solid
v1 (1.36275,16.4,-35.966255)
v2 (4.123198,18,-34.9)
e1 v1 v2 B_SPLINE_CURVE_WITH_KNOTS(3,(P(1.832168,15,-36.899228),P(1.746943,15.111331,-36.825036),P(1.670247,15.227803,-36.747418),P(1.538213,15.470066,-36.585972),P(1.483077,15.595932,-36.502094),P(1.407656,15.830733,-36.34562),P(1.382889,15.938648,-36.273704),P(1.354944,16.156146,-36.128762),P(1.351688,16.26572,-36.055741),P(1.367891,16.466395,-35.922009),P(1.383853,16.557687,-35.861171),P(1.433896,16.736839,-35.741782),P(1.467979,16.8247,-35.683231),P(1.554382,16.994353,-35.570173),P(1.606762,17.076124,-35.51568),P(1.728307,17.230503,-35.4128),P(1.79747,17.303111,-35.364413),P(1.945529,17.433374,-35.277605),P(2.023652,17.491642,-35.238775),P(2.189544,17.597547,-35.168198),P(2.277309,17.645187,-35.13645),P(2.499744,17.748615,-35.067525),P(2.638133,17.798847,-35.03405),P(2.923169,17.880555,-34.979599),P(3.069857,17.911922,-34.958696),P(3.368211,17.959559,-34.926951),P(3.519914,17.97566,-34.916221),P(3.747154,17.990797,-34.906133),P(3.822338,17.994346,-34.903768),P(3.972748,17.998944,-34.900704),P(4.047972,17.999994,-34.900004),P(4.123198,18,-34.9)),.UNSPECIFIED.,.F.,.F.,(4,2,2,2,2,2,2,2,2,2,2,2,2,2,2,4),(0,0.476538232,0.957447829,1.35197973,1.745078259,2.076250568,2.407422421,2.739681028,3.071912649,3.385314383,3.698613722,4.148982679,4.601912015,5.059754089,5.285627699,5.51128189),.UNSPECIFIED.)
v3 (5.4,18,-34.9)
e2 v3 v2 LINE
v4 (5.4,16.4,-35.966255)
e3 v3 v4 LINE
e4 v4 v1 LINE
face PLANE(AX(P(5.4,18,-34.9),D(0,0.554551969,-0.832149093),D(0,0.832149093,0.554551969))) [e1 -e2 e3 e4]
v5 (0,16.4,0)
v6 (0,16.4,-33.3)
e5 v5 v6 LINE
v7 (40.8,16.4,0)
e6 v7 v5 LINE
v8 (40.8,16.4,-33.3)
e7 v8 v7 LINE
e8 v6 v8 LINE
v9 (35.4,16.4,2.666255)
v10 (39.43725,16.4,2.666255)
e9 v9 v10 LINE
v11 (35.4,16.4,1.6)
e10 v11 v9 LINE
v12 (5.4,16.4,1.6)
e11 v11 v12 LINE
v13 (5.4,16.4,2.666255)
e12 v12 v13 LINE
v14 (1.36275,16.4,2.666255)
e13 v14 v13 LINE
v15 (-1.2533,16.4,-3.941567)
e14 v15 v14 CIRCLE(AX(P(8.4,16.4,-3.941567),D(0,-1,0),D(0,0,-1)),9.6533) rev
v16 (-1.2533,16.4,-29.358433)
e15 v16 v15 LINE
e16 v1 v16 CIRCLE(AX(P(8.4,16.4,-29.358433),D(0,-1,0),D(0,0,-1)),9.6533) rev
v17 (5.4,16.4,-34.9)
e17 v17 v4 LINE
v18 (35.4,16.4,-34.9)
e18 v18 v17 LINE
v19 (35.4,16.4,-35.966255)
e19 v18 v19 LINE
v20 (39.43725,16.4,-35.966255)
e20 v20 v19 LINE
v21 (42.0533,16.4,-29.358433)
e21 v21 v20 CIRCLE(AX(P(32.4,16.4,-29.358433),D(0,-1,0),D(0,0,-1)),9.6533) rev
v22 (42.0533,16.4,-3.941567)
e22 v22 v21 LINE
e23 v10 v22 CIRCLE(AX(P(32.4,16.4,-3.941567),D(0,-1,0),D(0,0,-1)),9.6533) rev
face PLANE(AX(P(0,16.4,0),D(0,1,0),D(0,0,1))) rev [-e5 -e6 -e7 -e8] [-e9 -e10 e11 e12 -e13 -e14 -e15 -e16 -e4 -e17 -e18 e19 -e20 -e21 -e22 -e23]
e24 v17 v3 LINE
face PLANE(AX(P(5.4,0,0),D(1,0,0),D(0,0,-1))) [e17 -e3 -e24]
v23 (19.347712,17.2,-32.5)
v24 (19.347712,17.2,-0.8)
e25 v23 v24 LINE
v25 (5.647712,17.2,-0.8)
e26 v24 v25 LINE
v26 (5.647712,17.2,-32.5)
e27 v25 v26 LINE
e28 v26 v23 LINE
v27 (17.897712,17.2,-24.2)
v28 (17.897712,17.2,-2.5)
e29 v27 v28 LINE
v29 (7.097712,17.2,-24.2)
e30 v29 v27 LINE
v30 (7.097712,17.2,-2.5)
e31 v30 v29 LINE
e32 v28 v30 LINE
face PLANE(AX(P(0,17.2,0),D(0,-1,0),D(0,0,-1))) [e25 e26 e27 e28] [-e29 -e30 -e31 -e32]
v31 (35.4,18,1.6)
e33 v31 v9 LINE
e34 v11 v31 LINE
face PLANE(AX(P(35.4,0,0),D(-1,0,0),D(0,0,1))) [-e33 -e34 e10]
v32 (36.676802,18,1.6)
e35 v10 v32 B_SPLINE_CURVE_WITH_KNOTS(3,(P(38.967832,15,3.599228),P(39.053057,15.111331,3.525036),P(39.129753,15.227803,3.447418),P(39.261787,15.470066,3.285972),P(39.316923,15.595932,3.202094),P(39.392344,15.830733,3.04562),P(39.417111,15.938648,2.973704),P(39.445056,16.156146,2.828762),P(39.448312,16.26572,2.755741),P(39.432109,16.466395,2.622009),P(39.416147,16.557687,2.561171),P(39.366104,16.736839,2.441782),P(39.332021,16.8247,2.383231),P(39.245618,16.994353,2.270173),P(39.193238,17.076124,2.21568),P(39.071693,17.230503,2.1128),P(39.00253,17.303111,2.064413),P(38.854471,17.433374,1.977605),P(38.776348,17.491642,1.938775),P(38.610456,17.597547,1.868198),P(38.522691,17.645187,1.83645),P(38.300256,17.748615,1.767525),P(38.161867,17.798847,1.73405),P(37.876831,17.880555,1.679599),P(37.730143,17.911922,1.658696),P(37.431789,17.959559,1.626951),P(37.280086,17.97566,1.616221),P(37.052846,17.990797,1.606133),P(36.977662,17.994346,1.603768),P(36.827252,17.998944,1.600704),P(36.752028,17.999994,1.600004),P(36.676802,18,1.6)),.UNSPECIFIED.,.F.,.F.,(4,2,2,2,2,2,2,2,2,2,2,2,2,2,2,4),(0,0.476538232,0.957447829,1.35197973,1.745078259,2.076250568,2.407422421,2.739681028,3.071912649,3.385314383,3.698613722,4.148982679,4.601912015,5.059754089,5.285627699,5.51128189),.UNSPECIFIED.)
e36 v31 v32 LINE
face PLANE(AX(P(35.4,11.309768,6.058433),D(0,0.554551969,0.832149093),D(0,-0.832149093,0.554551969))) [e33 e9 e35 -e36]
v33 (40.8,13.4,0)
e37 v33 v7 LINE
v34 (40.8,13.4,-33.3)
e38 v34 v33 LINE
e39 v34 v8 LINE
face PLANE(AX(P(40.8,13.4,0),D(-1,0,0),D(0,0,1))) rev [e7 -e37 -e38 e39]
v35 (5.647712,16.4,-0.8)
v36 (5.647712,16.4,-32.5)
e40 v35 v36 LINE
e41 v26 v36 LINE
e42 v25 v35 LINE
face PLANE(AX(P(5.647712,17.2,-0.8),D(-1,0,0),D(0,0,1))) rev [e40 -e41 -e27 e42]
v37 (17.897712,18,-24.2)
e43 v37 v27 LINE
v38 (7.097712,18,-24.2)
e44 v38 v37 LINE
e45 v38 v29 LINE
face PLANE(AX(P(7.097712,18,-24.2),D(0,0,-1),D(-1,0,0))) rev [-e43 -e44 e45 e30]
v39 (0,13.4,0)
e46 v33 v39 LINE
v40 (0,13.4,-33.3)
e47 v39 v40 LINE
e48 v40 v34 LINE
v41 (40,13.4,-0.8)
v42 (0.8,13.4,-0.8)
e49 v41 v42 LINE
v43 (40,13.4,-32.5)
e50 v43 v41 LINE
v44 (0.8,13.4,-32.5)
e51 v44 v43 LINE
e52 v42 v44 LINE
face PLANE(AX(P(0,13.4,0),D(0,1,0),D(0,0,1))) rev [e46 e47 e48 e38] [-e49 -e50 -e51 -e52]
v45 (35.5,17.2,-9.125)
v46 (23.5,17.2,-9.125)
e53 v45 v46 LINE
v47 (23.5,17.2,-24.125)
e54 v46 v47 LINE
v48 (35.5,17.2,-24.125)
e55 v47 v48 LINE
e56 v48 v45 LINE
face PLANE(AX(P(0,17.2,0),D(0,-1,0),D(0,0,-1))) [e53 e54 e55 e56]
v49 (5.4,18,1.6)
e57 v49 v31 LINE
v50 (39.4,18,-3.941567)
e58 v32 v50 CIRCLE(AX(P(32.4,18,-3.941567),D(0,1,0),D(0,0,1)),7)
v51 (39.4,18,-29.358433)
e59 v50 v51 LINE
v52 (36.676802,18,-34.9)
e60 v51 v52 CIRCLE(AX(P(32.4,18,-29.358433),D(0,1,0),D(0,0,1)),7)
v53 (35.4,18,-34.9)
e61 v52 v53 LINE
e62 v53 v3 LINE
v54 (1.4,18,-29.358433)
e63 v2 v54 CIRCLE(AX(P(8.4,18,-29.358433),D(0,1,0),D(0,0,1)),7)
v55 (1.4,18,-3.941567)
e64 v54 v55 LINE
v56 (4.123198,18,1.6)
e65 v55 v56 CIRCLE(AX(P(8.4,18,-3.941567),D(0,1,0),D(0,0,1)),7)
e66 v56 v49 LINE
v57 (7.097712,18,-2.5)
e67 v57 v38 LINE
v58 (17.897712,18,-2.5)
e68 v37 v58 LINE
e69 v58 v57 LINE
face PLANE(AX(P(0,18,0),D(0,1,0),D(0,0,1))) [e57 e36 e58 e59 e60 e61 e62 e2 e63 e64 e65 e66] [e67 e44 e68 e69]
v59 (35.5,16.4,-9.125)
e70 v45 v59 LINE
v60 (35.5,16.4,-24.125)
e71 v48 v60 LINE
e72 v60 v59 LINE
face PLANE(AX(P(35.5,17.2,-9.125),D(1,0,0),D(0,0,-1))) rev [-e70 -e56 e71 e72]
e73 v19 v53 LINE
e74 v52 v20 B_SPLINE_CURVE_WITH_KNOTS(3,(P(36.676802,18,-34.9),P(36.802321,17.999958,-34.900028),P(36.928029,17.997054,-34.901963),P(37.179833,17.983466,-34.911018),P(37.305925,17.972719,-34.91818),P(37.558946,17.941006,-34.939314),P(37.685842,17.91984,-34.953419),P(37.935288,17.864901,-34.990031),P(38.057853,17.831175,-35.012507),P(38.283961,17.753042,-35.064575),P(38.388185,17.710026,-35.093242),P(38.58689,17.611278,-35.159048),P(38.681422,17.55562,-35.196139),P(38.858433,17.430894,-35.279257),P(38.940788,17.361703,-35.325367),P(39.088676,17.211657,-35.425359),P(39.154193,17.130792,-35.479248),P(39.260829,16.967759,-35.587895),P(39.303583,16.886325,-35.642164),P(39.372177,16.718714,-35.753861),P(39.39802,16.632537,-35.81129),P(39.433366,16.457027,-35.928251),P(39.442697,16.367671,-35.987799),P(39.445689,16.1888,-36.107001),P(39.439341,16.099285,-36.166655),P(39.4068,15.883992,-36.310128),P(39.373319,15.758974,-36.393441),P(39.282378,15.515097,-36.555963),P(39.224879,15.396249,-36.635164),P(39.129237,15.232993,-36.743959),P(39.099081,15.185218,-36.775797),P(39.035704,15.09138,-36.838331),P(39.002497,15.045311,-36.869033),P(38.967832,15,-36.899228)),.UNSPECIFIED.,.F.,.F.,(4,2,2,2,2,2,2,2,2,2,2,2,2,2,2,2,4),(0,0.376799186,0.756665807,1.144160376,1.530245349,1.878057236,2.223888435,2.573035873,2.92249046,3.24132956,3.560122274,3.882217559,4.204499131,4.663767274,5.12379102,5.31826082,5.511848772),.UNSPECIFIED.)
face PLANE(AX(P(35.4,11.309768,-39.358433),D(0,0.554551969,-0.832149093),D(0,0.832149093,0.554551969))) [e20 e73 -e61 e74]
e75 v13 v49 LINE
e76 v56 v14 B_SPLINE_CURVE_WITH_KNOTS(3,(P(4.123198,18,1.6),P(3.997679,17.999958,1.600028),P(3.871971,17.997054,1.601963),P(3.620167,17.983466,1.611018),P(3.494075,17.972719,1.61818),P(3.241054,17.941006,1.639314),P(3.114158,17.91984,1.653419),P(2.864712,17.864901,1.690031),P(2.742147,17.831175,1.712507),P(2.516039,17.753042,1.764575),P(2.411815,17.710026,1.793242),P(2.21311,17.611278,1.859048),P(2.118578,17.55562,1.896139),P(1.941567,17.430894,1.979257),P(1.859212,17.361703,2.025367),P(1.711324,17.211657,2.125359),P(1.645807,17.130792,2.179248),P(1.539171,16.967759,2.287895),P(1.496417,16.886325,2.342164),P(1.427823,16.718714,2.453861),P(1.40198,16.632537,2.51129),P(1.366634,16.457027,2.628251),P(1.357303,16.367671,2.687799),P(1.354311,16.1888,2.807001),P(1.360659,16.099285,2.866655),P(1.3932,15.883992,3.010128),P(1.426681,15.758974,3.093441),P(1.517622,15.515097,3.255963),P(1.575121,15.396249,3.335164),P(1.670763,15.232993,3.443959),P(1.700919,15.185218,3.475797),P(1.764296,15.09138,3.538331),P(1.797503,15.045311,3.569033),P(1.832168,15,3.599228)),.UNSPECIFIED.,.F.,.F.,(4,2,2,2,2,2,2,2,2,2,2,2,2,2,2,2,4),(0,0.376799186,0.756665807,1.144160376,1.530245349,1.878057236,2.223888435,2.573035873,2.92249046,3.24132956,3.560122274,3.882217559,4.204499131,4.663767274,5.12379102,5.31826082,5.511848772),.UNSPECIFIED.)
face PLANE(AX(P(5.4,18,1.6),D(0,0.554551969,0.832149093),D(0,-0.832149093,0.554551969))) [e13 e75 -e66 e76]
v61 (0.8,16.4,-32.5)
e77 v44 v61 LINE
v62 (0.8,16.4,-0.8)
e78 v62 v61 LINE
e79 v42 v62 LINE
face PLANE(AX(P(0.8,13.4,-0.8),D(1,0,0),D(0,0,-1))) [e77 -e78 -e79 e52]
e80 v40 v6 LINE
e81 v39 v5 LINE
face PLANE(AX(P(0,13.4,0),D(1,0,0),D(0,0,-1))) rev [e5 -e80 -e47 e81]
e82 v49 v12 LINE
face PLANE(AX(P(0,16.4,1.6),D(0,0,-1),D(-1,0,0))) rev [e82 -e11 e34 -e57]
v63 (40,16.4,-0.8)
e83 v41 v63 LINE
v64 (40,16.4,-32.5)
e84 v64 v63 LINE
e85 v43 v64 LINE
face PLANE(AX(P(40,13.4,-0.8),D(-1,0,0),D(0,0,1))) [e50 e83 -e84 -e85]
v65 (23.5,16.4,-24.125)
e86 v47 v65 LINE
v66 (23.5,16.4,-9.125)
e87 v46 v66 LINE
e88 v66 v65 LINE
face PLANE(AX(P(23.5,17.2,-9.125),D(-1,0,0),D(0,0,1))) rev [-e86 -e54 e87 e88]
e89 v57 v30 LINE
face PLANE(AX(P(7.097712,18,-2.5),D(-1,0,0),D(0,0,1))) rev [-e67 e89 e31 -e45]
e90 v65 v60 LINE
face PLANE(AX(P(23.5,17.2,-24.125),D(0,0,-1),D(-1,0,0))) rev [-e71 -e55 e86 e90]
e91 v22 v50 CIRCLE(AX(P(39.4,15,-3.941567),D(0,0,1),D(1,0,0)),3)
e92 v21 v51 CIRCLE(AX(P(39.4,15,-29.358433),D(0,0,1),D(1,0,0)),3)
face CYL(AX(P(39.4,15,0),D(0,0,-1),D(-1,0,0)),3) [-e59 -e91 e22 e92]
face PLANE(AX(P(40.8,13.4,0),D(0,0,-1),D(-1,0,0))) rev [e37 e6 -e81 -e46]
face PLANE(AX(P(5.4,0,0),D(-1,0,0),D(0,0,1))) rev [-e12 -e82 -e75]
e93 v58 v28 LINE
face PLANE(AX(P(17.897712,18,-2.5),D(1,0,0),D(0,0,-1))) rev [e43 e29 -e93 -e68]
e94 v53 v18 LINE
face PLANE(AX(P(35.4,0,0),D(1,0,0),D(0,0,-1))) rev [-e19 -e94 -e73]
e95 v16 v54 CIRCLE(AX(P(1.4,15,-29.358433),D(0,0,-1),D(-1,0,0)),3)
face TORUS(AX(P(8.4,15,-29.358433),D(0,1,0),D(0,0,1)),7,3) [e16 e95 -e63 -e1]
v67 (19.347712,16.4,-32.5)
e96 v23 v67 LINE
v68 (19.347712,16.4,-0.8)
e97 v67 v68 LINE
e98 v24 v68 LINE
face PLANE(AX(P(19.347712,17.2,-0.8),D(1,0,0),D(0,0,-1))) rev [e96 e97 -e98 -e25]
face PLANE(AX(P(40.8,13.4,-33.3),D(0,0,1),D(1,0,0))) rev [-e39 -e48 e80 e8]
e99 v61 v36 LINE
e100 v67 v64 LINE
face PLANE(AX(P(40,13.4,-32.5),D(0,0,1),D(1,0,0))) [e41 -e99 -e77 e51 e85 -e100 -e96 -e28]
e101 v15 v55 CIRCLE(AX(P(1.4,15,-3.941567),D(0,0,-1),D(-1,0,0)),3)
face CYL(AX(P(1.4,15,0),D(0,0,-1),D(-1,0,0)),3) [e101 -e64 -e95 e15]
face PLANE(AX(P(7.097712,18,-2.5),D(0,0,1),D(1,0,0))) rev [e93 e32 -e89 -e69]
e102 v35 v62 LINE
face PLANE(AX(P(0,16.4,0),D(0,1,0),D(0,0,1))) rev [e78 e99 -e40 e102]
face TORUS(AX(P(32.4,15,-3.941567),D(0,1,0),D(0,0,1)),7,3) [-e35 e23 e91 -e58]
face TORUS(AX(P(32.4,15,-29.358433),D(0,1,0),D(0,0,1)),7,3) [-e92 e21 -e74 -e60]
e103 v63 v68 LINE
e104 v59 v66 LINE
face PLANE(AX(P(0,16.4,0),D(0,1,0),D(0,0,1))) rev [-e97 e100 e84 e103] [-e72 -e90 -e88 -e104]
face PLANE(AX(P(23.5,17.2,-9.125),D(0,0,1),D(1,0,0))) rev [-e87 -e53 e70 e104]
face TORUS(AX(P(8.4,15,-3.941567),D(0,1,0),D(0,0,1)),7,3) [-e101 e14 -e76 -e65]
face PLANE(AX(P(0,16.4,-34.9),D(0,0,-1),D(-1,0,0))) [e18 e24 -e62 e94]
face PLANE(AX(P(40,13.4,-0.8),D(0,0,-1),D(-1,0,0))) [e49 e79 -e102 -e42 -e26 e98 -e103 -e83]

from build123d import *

# Parameters (mm, degrees)
SKETCH_1_W          = 40.8
SKETCH_1_H          = 33.3
EXTRUDE_3_DEPTH     = 16.4
SKETCH_2_W          = 40.8
SKETCH_2_H          = 33.3
EXTRUDE_4_DEPTH     = 1.6
SKETCH_4_W          = 17.099999999999994
SKETCH_4_H          = 13.8
CUT_EXTRUDE_1_DEPTH = 0.8
SKETCH_5_W          = 4.100000000000001
SKETCH_5_H          = 6.399999999999999
CUT_EXTRUDE_2_DEPTH = 0.8
EXTRUDE_5_DEPTH     = 3.5
EXTRUDE_5_2_DEPTH   = 3.5
EXTRUDE_5_3_DEPTH   = 3.5
SKETCH_6_W          = 3.000000000000007
SKETCH_6_H          = 3.0000000000000036
EXTRUDE_5_4_DEPTH   = 3.5
SKETCH_7_W          = 3.000000000000007
SKETCH_7_H          = 33.3
EXTRUDE_7_DEPTH     = 1.6
SKETCH_8_R          = 2.4500000000000015
SKETCH_8_W          = 10.999999999999998
SKETCH_8_H          = 4.8999999999999995
CUT_EXTRUDE_3_DEPTH = 1.6
SKETCH_10_W         = 44
SKETCH_10_H         = 36.49999999999999
EXTRUDE_8_DEPTH     = 1.6
SKETCH_11_W         = 2.0999999999999996
SKETCH_11_H         = 6.020000000000001
EXTRUDE_9_DEPTH     = 44
EXTRUDE_12_DEPTH    = 7
SKETCH_15_W         = 2.1000000000000085
SKETCH_15_H         = 6.019999999999997
EXTRUDE_13_DEPTH    = 37
EXTRUDE_14_DEPTH    = 7
EXTRUDE_15_DEPTH    = 7
FILLET_1_R          = 10
FILLET_2_R          = 3.2
FILLET_3_R          = 3
SKETCH_17_W         = 56.29646115275759
SKETCH_17_H         = 50.293284015615065
CUT_EXTRUDE_4_DEPTH = 16.4
EXTRUDE_16_DEPTH    = 3
CUT_EXTRUDE_6_DEPTH = 0.8
CUT_EXTRUDE_7_DEPTH = 0.8
CUT_EXTRUDE_8_DEPTH = 0.8


with BuildPart() as part:
    # Эскиз1 → Бобышка-Вытянуть3 (new body)
    with BuildSketch(Plane(origin=(0, 0, 0), x_dir=(1, 0, 0), z_dir=(0, 1, 0))):
        Polygon((42.399999999999984, 34.89999999999999), (42.39999999999999, -1.600000000000004), (-1.6000000000000032, -1.600000000000004), (-1.6000000000000076, 34.89999999999999), align=None)
        with Locations((20.4, 16.65)):
            Rectangle(SKETCH_1_W, SKETCH_1_H, mode=Mode.SUBTRACT)
    extrude(amount=EXTRUDE_3_DEPTH)

    # Эскиз2 → Бобышка-Вытянуть4 (add)
    with BuildSketch(Plane(origin=(0, 0, 0), x_dir=(-1, 0, 0), z_dir=(0, -1, 0))):
        with Locations((-20.4, 16.65)):
            Rectangle(SKETCH_2_W, SKETCH_2_H)
    extrude(amount=-EXTRUDE_4_DEPTH)

    # Эскиз4 → Вырез-Вытянуть1 (cut)
    with BuildSketch(Plane(origin=(0, 1.6, 0), x_dir=(1, 0, 0), z_dir=(0, 1, 0))):
        with Locations((20.4, 16.65)):
            Rectangle(SKETCH_4_W, SKETCH_4_H)
    extrude(amount=-CUT_EXTRUDE_1_DEPTH, mode=Mode.SUBTRACT)

    # Эскиз5 → Вырез-Вытянуть2 (cut)
    with BuildSketch(Plane(origin=(0, 0.8, 0), x_dir=(1, 0, 0), z_dir=(0, 1, 0))):
        with Locations((20.4, 16.65)):
            Rectangle(SKETCH_5_W, SKETCH_5_H)
    extrude(amount=-CUT_EXTRUDE_2_DEPTH, mode=Mode.SUBTRACT)

    # Эскиз8 → Вырез-Вытянуть3 (cut)
    with BuildSketch(Plane.ZY.offset(1.6000000000000034)):
        with Locations((-22.149999999999995, 8.95)):
            Circle(SKETCH_8_R)
        with Locations((-11.149999999999993, 8.95)):
            Circle(SKETCH_8_R)
        with Locations((-16.64999999999999, 8.950000000000001)):
            Rectangle(SKETCH_8_W, SKETCH_8_H)
    extrude(amount=-CUT_EXTRUDE_3_DEPTH, mode=Mode.SUBTRACT)

    # Эскиз10 → Бобышка-Вытянуть8 (add)
    with BuildSketch(Plane(origin=(0, 16.4, 0), x_dir=(1, 0, 0), z_dir=(0, 1, 0))):
        with Locations((20.39999999999999, 16.649999999999995)):
            Rectangle(SKETCH_10_W, SKETCH_10_H)
    extrude(amount=EXTRUDE_8_DEPTH)



with BuildPart() as body_2:
    # Эскиз6 → Бобышка-Вытянуть5 (new body)
    with BuildSketch(Plane(origin=(0, 1.6, 0), x_dir=(1, 0, 0), z_dir=(0, 1, 0))):
        Polygon((0, 33.3), (3, 33.3), (3.0000000000000004, 30.299999999999997), (3.7e-16, 30.299999999999997), align=None)
    extrude(amount=EXTRUDE_5_DEPTH)


with BuildPart() as body_3:
    # Эскиз6 → Extrude 5 2 (new body)
    with BuildSketch(Plane(origin=(0, 1.6, 0), x_dir=(1, 0, 0), z_dir=(0, 1, 0))):
        Polygon((0, 0), (3, 0), (2.9999999999999996, 3), (-8.7e-16, 3), align=None)
    extrude(amount=EXTRUDE_5_2_DEPTH)


with BuildPart() as body_4:
    # Эскиз6 → Extrude 5 3 (new body)
    with BuildSketch(Plane(origin=(0, 1.6, 0), x_dir=(1, 0, 0), z_dir=(0, 1, 0))):
        Polygon((40.8, 0), (37.79999999999999, -3.7e-16), (37.79999999999999, 2.9999999999999996), (40.8, 3), align=None)
    extrude(amount=EXTRUDE_5_3_DEPTH)


with BuildPart() as body_5:
    # Эскиз6 → Extrude 5 4 (new body)
    with BuildSketch(Plane(origin=(0, 1.6, 0), x_dir=(1, 0, 0), z_dir=(0, 1, 0))):
        with Locations((39.3, 31.799999999999997)):
            Rectangle(SKETCH_6_W, SKETCH_6_H)
    extrude(amount=EXTRUDE_5_4_DEPTH)


with BuildPart() as body_6:
    # Эскиз7 → Бобышка-Вытянуть7 (new body)
    with BuildSketch(Plane(origin=(0, 5.1000000000000005, 0), x_dir=(1, 0, 0), z_dir=(0, 1, 0))):
        with Locations((39.3, 16.65)):
            Rectangle(SKETCH_7_W, SKETCH_7_H)
    extrude(amount=EXTRUDE_7_DEPTH)


with BuildPart() as body_6_1:
    # Move Body 1: read off the stored shape, not the designer's step
    # Move Body 1: moved
    add(body_6.part.moved(Location((0, 5.27, 0))))


with BuildPart() as body_7:
    # Эскиз11 → Бобышка-Вытянуть9 (new body)
    with BuildSketch(Plane(origin=(42.39999999999999, 0, -8.06e-15), x_dir=(-1.9e-16, 0, -1), z_dir=(1, 0, -1.9e-16))):
        with Locations((-5.008433364905541, 9)):
            Rectangle(SKETCH_11_W, SKETCH_11_H)
    extrude(amount=-EXTRUDE_9_DEPTH)


with BuildPart() as part_1:
    add(part.part)

    add(body_7.part)  # Бобышка-Вытянуть12 merges body 7
    # Эскиз12 → Бобышка-Вытянуть12 (add)
    with BuildSketch(Plane(origin=(42.39999999999999, 0, -8.06e-15), x_dir=(-1.9e-16, 0, -1), z_dir=(1, 0, -1.9e-16))):
        Polygon((-1.6000000000000123, 0), (-6.0584333649055395, 6.675491735766058), (-6.05843336490554, 11.309768082903124), (-1.6000000000000123, 18), align=None)
        Polygon((34.899999999999984, 18.00000000000004), (34.899999999999984, 3.25e-15), (39.35843336490551, 6.675491735766043), (39.35843336490551, 11.309768082903172), align=None)
    extrude(amount=-EXTRUDE_12_DEPTH)

    # Эскиз15 → Бобышка-Вытянуть13 (add)
    with BuildSketch(Plane.ZY.offset(-35.39999999999997)):
        with Locations((-38.30843336490551, 8.994768082903173)):
            Rectangle(SKETCH_15_W, SKETCH_15_H)
    extrude(amount=EXTRUDE_13_DEPTH)

    # Эскиз16 → Бобышка-Вытянуть14 (add)
    with BuildSketch(Plane.ZY.offset(1.6000000000000034)):
        Polygon((-34.89999999999999, 18), (-39.358433364905515, 11.309768082903172), (-39.358433364905515, 6.6797680829031725), (-34.89999999999999, 0), align=None)
    extrude(amount=-EXTRUDE_14_DEPTH)

    # Эскиз14 → Бобышка-Вытянуть15 (add)
    with BuildSketch(Plane.ZY.offset(1.6000000000000034)):
        Polygon((1.600000000000004, 18), (6.058433364905541, 11.309768082903124), (6.05843336490554, 6.675491735766058), (1.600000000000004, 0), align=None)
    extrude(amount=-EXTRUDE_15_DEPTH)

    # Скругление1
    # the kernel refuses this fillet: 10 mm, written as the material it takes off along each edge
    with BuildSketch(Plane(origin=(-1.6000000000000074, 37.010000000000005, 6.05843336490554), x_dir=(4.2e-16, 0, -1), z_dir=(0, -1, 0))) as fillet_1_piece_1:
        with BuildLine():
            CenterArc((FILLET_1_R, FILLET_1_R), FILLET_1_R, 180, 89.99999999999994)
            Line((6.88e-15, FILLET_1_R), (0, 0))
            Line((0, 0), (FILLET_1_R, 0))
        make_face()
    extrude(amount=56.02000000000001, mode=Mode.SUBTRACT)
    with BuildSketch(Plane(origin=(42.39999999999999, 37.01, 6.058433364905532), x_dir=(0, 0, -1), z_dir=(0, -1, 0))) as fillet_1_piece_2:
        with BuildLine():
            CenterArc((FILLET_1_R, -FILLET_1_R), FILLET_1_R, 89.99999999999999, 90.00000000000001)
            Line((-5.33e-15, -FILLET_1_R), (0, 0))
            Line((0, 0), (FILLET_1_R, 0))
        make_face()
    extrude(amount=56.019999999999996, mode=Mode.SUBTRACT)
    with BuildSketch(Plane(origin=(42.399999999999984, -18.324508264233955, -39.358433364905515), x_dir=(0, 0, 1), z_dir=(0, 1, 0))) as fillet_1_piece_3:
        with BuildLine():
            CenterArc((FILLET_1_R, -FILLET_1_R), FILLET_1_R, 90.00000000000003, 89.99999999999997)
            Line((7.11e-15, -FILLET_1_R), (0, 0))
            Line((0, 0), (FILLET_1_R, 0))
        make_face()
    extrude(amount=54.634276347137124, mode=Mode.SUBTRACT)
    with BuildSketch(Plane(origin=(-1.6000000000000298, -19.015231917096827, -39.358433364905515), x_dir=(1, 0, 7.1e-16), z_dir=(0, 1, 0))) as fillet_1_piece_4:
        with BuildLine():
            CenterArc((FILLET_1_R, -FILLET_1_R), FILLET_1_R, 90.00000000000006, 89.99999999999994)
            Line((8.88e-15, -FILLET_1_R), (0, 0))
            Line((0, 0), (FILLET_1_R, 0))
        make_face()
    extrude(amount=56.02, mode=Mode.SUBTRACT)

    # Скругление2
    # the kernel refuses this fillet: 3.2 mm, written as the material it takes off along each edge
    with BuildSketch(Plane(origin=(35.39999999999997, 5.984768082903174, -37.25843336490551), x_dir=(0, 4.2e-16, -1), z_dir=(-1, 0, 0))) as fillet_2_piece_1:
        with BuildLine():
            CenterArc((3.200000000000004, -3.0049958402633457), FILLET_2_R, 110.10550978791592, 69.89449021208412)
            Line((1.27e-15, -3.004995840263347), (0, 0))
            Line((0, 0), (2.1000000000000085, 0))
        make_face()
    extrude(amount=29.99999999999998, mode=Mode.SUBTRACT)
    with BuildSketch(Plane(origin=(35.39999999999997, 5.984768082903174, -37.25843336490551), x_dir=(0, 4.2e-16, -1), z_dir=(-1, 0, 0))) as fillet_2_piece_2_section:
        with BuildLine():
            CenterArc((3.200000000000004, -3.0049958402633457), FILLET_2_R, 110.10550978791592, 69.89449021208412)
            Line((1.27e-15, -3.004995840263347), (0, 0))
            Line((0, 0), (2.1000000000000085, 0))
        make_face()
    fillet_2_piece_2 = extrude(amount=37.51248960065835, mode=Mode.PRIVATE)
    fillet_2_piece_2 = split(fillet_2_piece_2, bisect_by=Plane(origin=(35.39999999999997, 5.229293666046891, -38.39030940389469), z_dir=(0, -0.5551530875809806, -0.8317481886660796)), keep=Keep.TOP, mode=Mode.PRIVATE)
    add(fillet_2_piece_2, mode=Mode.SUBTRACT)
    with BuildSketch(Plane(origin=(35.39999999999997, 12.004768082903173, -37.25843336490551), x_dir=(0, -8.5e-16, -1), z_dir=(-1, 0, 0))) as fillet_2_piece_3:
        with BuildLine():
            CenterArc((3.2000000000000055, 3.004995840263345), FILLET_2_R, 179.99999999999994, 69.89449021208412)
            Line((2.54e-15, 3.004995840263348), (0, 0))
            Line((0, 0), (2.1000000000000085, 0))
        make_face()
    extrude(amount=29.99999999999998, mode=Mode.SUBTRACT)
    with BuildSketch(Plane(origin=(42.91248960065834, 12.004768082903173, -37.25843336490551), x_dir=(0, -8.5e-16, -1), z_dir=(-1, 0, 0))) as fillet_2_piece_4_section:
        with BuildLine():
            CenterArc((3.2000000000000055, 3.004995840263345), FILLET_2_R, 179.99999999999994, 69.89449021208412)
            Line((2.54e-15, 3.004995840263348), (0, 0))
            Line((0, 0), (2.1000000000000085, 0))
        make_face()
    fillet_2_piece_4 = extrude(amount=45.02497920131672, mode=Mode.PRIVATE)
    fillet_2_piece_4 = split(fillet_2_piece_4, bisect_by=Plane(origin=(42.91248960065834, 12.760123030249147, -38.39190321044578), z_dir=(0, 0.5545519689982268, -0.8321490934202775)), keep=Keep.TOP, mode=Mode.PRIVATE)
    add(fillet_2_piece_4, mode=Mode.SUBTRACT)
    with BuildSketch(Plane(origin=(35.39999999999999, 5.99, 3.958433364905534), x_dir=(1.9e-16, 0, 1), z_dir=(-1, 0, 1.9e-16))) as fillet_2_piece_5:
        with BuildLine():
            CenterArc((3.2000000000000006, 3.0049958402633443), FILLET_2_R, 180, 69.89449021208401)
            Line((4.4e-16, 3.0049958402633443), (0, 0))
            Line((0, 0), (2.1, 0))
        make_face()
    extrude(amount=29.999999999999993, mode=Mode.SUBTRACT)
    with BuildSketch(Plane(origin=(42.91248960065835, 12.01, 3.9584333649055328), x_dir=(1.9e-16, 8.5e-16, 1), z_dir=(-1, 0, 1.9e-16))) as fillet_2_piece_6_section:
        with BuildLine():
            CenterArc((3.1999999999999984, -3.004995840263345), FILLET_2_R, 110.10550978791599, 69.89449021208395)
            Line((-2.1e-15, -3.0049958402633425), (0, 0))
            Line((0, 0), (2.0999999999999996, 0))
        make_face()
    fillet_2_piece_6 = extrude(amount=45.024979201316704, mode=Mode.PRIVATE)
    fillet_2_piece_6 = split(fillet_2_piece_6, bisect_by=Plane(origin=(42.91248960065835, 12.763745986939767, 5.089488838090781), z_dir=(0, 0.5545519689982267, 0.8321490934202775)), keep=Keep.TOP, mode=Mode.PRIVATE)
    add(fillet_2_piece_6, mode=Mode.SUBTRACT)
    with BuildSketch(Plane(origin=(35.39999999999999, 12.01, 3.958433364905534), x_dir=(1.9e-16, 8.5e-16, 1), z_dir=(-1, 0, 1.9e-16))) as fillet_2_piece_7:
        with BuildLine():
            CenterArc((3.199999999999998, -3.004995840263345), FILLET_2_R, 110.10550978791599, 69.89449021208395)
            Line((-2.1e-15, -3.0049958402633425), (0, 0))
            Line((0, 0), (2.099999999999999, 0))
        make_face()
    extrude(amount=29.999999999999993, mode=Mode.SUBTRACT)

    # Скругление3
    fillet_3_edges = [part_1.edges().sort_by_distance(p)[0] for p in [
        (41.97186604889837, 17.999999999999996, -32.25314929949211),
        (41.97186604889837, 0, -32.25314929949211),
        (41.97186604889836, 0, -1.0468507005078767),
        (41.97186604889836, 18, -1.0468507005078767),
        (42.39999999999999, 18, -16.65),
        (42.399999999999984, 0, -16.65),
        (-1.6000000000000076, 18, -16.65),
        (-1.6000000000000054, 0, -16.65),
        (-1.1718660488983677, 0, -32.25314929949211),
        (-1.1718660488983677, 17.999999999999996, -32.25314929949211),
        (-1.171866048898364, 0, -1.0468507005078784),
        (-1.171866048898364, 18, -1.0468507005078784),
    ]]
    fillet(fillet_3_edges, radius=FILLET_3_R)


with BuildPart() as cut_extrude_4_tool:
    # Эскиз17 → Вырез-Вытянуть4 (new body)
    with BuildSketch(Plane.XZ):
        with Locations((20.4, -16.650000000000002)):
            Rectangle(SKETCH_17_W, SKETCH_17_H)
    extrude(amount=-CUT_EXTRUDE_4_DEPTH)


with BuildPart() as part_2:
    add(part_1.part)

    # Вырез-Вытянуть4: cut by cut_extrude_4_tool
    add(cut_extrude_4_tool.part, mode=Mode.SUBTRACT)

    # Эскиз18 → Бобышка-Вытянуть16 (add)
    with BuildSketch(Plane(origin=(0, 16.4, 0), x_dir=(-1, 0, 0), z_dir=(0, -1, 0))):
        Polygon((-40.79999999999996, 9.16e-15), (3.296e-14, 1.166e-14), (3.123e-14, 33.30000000000001), (-40.79999999999996, 33.30000000000001), align=None)
        Polygon((-39.999999999999964, 0.8000000000000085), (-0.7999999999999708, 0.8000000000000107), (-0.7999999999999735, 32.500000000000014), (-39.999999999999964, 32.500000000000014), align=None, mode=Mode.SUBTRACT)
    extrude(amount=EXTRUDE_16_DEPTH)

    # Эскиз21 → Вырез-Вытянуть6 (cut)
    with BuildSketch(Plane.XZ.offset(-16.4)):
        Polygon((5.64771181596363, -0.8000000000000085), (19.34771181596362, -0.800000000000006), (19.34771181596363, -32.500000000000014), (5.647711815963632, -32.500000000000014), align=None)
    extrude(amount=-CUT_EXTRUDE_6_DEPTH, mode=Mode.SUBTRACT)

    # Эскиз22 → Вырез-Вытянуть7 (cut)
    with BuildSketch(Plane.XZ.offset(-16.4)):
        Polygon((23.499999999999968, -9.125000000000016), (35.49999999999997, -9.125000000000016), (35.49999999999997, -24.125000000000014), (23.499999999999968, -24.125000000000018), align=None)
    extrude(amount=-CUT_EXTRUDE_7_DEPTH, mode=Mode.SUBTRACT)

    # Эскиз23 → Вырез-Вытянуть8 (cut)
    with BuildSketch(Plane.XZ.offset(-17.199999999999996)):
        Polygon((7.0977118159636365, -2.5000000000000115), (17.89771181596363, -2.5000000000000093), (17.897711815963632, -24.200000000000014), (7.097711815963637, -24.200000000000014), align=None)
    extrude(amount=-CUT_EXTRUDE_8_DEPTH, mode=Mode.SUBTRACT)


with BuildPart() as body_2_1:
    add(body_2.part)

    # Вырез-Вытянуть4: cut by cut_extrude_4_tool
    add(cut_extrude_4_tool.part, mode=Mode.SUBTRACT)


with BuildPart() as body_3_1:
    add(body_3.part)

    # Вырез-Вытянуть4: cut by cut_extrude_4_tool
    add(cut_extrude_4_tool.part, mode=Mode.SUBTRACT)


with BuildPart() as body_4_1:
    add(body_4.part)

    # Вырез-Вытянуть4: cut by cut_extrude_4_tool
    add(cut_extrude_4_tool.part, mode=Mode.SUBTRACT)


with BuildPart() as body_5_1:
    add(body_5.part)

    # Вырез-Вытянуть4: cut by cut_extrude_4_tool
    add(cut_extrude_4_tool.part, mode=Mode.SUBTRACT)


with BuildPart() as body_6_2:
    add(body_6_1.part)

    # Вырез-Вытянуть4: cut by cut_extrude_4_tool
    add(cut_extrude_4_tool.part, mode=Mode.SUBTRACT)


solid = part_2.part
